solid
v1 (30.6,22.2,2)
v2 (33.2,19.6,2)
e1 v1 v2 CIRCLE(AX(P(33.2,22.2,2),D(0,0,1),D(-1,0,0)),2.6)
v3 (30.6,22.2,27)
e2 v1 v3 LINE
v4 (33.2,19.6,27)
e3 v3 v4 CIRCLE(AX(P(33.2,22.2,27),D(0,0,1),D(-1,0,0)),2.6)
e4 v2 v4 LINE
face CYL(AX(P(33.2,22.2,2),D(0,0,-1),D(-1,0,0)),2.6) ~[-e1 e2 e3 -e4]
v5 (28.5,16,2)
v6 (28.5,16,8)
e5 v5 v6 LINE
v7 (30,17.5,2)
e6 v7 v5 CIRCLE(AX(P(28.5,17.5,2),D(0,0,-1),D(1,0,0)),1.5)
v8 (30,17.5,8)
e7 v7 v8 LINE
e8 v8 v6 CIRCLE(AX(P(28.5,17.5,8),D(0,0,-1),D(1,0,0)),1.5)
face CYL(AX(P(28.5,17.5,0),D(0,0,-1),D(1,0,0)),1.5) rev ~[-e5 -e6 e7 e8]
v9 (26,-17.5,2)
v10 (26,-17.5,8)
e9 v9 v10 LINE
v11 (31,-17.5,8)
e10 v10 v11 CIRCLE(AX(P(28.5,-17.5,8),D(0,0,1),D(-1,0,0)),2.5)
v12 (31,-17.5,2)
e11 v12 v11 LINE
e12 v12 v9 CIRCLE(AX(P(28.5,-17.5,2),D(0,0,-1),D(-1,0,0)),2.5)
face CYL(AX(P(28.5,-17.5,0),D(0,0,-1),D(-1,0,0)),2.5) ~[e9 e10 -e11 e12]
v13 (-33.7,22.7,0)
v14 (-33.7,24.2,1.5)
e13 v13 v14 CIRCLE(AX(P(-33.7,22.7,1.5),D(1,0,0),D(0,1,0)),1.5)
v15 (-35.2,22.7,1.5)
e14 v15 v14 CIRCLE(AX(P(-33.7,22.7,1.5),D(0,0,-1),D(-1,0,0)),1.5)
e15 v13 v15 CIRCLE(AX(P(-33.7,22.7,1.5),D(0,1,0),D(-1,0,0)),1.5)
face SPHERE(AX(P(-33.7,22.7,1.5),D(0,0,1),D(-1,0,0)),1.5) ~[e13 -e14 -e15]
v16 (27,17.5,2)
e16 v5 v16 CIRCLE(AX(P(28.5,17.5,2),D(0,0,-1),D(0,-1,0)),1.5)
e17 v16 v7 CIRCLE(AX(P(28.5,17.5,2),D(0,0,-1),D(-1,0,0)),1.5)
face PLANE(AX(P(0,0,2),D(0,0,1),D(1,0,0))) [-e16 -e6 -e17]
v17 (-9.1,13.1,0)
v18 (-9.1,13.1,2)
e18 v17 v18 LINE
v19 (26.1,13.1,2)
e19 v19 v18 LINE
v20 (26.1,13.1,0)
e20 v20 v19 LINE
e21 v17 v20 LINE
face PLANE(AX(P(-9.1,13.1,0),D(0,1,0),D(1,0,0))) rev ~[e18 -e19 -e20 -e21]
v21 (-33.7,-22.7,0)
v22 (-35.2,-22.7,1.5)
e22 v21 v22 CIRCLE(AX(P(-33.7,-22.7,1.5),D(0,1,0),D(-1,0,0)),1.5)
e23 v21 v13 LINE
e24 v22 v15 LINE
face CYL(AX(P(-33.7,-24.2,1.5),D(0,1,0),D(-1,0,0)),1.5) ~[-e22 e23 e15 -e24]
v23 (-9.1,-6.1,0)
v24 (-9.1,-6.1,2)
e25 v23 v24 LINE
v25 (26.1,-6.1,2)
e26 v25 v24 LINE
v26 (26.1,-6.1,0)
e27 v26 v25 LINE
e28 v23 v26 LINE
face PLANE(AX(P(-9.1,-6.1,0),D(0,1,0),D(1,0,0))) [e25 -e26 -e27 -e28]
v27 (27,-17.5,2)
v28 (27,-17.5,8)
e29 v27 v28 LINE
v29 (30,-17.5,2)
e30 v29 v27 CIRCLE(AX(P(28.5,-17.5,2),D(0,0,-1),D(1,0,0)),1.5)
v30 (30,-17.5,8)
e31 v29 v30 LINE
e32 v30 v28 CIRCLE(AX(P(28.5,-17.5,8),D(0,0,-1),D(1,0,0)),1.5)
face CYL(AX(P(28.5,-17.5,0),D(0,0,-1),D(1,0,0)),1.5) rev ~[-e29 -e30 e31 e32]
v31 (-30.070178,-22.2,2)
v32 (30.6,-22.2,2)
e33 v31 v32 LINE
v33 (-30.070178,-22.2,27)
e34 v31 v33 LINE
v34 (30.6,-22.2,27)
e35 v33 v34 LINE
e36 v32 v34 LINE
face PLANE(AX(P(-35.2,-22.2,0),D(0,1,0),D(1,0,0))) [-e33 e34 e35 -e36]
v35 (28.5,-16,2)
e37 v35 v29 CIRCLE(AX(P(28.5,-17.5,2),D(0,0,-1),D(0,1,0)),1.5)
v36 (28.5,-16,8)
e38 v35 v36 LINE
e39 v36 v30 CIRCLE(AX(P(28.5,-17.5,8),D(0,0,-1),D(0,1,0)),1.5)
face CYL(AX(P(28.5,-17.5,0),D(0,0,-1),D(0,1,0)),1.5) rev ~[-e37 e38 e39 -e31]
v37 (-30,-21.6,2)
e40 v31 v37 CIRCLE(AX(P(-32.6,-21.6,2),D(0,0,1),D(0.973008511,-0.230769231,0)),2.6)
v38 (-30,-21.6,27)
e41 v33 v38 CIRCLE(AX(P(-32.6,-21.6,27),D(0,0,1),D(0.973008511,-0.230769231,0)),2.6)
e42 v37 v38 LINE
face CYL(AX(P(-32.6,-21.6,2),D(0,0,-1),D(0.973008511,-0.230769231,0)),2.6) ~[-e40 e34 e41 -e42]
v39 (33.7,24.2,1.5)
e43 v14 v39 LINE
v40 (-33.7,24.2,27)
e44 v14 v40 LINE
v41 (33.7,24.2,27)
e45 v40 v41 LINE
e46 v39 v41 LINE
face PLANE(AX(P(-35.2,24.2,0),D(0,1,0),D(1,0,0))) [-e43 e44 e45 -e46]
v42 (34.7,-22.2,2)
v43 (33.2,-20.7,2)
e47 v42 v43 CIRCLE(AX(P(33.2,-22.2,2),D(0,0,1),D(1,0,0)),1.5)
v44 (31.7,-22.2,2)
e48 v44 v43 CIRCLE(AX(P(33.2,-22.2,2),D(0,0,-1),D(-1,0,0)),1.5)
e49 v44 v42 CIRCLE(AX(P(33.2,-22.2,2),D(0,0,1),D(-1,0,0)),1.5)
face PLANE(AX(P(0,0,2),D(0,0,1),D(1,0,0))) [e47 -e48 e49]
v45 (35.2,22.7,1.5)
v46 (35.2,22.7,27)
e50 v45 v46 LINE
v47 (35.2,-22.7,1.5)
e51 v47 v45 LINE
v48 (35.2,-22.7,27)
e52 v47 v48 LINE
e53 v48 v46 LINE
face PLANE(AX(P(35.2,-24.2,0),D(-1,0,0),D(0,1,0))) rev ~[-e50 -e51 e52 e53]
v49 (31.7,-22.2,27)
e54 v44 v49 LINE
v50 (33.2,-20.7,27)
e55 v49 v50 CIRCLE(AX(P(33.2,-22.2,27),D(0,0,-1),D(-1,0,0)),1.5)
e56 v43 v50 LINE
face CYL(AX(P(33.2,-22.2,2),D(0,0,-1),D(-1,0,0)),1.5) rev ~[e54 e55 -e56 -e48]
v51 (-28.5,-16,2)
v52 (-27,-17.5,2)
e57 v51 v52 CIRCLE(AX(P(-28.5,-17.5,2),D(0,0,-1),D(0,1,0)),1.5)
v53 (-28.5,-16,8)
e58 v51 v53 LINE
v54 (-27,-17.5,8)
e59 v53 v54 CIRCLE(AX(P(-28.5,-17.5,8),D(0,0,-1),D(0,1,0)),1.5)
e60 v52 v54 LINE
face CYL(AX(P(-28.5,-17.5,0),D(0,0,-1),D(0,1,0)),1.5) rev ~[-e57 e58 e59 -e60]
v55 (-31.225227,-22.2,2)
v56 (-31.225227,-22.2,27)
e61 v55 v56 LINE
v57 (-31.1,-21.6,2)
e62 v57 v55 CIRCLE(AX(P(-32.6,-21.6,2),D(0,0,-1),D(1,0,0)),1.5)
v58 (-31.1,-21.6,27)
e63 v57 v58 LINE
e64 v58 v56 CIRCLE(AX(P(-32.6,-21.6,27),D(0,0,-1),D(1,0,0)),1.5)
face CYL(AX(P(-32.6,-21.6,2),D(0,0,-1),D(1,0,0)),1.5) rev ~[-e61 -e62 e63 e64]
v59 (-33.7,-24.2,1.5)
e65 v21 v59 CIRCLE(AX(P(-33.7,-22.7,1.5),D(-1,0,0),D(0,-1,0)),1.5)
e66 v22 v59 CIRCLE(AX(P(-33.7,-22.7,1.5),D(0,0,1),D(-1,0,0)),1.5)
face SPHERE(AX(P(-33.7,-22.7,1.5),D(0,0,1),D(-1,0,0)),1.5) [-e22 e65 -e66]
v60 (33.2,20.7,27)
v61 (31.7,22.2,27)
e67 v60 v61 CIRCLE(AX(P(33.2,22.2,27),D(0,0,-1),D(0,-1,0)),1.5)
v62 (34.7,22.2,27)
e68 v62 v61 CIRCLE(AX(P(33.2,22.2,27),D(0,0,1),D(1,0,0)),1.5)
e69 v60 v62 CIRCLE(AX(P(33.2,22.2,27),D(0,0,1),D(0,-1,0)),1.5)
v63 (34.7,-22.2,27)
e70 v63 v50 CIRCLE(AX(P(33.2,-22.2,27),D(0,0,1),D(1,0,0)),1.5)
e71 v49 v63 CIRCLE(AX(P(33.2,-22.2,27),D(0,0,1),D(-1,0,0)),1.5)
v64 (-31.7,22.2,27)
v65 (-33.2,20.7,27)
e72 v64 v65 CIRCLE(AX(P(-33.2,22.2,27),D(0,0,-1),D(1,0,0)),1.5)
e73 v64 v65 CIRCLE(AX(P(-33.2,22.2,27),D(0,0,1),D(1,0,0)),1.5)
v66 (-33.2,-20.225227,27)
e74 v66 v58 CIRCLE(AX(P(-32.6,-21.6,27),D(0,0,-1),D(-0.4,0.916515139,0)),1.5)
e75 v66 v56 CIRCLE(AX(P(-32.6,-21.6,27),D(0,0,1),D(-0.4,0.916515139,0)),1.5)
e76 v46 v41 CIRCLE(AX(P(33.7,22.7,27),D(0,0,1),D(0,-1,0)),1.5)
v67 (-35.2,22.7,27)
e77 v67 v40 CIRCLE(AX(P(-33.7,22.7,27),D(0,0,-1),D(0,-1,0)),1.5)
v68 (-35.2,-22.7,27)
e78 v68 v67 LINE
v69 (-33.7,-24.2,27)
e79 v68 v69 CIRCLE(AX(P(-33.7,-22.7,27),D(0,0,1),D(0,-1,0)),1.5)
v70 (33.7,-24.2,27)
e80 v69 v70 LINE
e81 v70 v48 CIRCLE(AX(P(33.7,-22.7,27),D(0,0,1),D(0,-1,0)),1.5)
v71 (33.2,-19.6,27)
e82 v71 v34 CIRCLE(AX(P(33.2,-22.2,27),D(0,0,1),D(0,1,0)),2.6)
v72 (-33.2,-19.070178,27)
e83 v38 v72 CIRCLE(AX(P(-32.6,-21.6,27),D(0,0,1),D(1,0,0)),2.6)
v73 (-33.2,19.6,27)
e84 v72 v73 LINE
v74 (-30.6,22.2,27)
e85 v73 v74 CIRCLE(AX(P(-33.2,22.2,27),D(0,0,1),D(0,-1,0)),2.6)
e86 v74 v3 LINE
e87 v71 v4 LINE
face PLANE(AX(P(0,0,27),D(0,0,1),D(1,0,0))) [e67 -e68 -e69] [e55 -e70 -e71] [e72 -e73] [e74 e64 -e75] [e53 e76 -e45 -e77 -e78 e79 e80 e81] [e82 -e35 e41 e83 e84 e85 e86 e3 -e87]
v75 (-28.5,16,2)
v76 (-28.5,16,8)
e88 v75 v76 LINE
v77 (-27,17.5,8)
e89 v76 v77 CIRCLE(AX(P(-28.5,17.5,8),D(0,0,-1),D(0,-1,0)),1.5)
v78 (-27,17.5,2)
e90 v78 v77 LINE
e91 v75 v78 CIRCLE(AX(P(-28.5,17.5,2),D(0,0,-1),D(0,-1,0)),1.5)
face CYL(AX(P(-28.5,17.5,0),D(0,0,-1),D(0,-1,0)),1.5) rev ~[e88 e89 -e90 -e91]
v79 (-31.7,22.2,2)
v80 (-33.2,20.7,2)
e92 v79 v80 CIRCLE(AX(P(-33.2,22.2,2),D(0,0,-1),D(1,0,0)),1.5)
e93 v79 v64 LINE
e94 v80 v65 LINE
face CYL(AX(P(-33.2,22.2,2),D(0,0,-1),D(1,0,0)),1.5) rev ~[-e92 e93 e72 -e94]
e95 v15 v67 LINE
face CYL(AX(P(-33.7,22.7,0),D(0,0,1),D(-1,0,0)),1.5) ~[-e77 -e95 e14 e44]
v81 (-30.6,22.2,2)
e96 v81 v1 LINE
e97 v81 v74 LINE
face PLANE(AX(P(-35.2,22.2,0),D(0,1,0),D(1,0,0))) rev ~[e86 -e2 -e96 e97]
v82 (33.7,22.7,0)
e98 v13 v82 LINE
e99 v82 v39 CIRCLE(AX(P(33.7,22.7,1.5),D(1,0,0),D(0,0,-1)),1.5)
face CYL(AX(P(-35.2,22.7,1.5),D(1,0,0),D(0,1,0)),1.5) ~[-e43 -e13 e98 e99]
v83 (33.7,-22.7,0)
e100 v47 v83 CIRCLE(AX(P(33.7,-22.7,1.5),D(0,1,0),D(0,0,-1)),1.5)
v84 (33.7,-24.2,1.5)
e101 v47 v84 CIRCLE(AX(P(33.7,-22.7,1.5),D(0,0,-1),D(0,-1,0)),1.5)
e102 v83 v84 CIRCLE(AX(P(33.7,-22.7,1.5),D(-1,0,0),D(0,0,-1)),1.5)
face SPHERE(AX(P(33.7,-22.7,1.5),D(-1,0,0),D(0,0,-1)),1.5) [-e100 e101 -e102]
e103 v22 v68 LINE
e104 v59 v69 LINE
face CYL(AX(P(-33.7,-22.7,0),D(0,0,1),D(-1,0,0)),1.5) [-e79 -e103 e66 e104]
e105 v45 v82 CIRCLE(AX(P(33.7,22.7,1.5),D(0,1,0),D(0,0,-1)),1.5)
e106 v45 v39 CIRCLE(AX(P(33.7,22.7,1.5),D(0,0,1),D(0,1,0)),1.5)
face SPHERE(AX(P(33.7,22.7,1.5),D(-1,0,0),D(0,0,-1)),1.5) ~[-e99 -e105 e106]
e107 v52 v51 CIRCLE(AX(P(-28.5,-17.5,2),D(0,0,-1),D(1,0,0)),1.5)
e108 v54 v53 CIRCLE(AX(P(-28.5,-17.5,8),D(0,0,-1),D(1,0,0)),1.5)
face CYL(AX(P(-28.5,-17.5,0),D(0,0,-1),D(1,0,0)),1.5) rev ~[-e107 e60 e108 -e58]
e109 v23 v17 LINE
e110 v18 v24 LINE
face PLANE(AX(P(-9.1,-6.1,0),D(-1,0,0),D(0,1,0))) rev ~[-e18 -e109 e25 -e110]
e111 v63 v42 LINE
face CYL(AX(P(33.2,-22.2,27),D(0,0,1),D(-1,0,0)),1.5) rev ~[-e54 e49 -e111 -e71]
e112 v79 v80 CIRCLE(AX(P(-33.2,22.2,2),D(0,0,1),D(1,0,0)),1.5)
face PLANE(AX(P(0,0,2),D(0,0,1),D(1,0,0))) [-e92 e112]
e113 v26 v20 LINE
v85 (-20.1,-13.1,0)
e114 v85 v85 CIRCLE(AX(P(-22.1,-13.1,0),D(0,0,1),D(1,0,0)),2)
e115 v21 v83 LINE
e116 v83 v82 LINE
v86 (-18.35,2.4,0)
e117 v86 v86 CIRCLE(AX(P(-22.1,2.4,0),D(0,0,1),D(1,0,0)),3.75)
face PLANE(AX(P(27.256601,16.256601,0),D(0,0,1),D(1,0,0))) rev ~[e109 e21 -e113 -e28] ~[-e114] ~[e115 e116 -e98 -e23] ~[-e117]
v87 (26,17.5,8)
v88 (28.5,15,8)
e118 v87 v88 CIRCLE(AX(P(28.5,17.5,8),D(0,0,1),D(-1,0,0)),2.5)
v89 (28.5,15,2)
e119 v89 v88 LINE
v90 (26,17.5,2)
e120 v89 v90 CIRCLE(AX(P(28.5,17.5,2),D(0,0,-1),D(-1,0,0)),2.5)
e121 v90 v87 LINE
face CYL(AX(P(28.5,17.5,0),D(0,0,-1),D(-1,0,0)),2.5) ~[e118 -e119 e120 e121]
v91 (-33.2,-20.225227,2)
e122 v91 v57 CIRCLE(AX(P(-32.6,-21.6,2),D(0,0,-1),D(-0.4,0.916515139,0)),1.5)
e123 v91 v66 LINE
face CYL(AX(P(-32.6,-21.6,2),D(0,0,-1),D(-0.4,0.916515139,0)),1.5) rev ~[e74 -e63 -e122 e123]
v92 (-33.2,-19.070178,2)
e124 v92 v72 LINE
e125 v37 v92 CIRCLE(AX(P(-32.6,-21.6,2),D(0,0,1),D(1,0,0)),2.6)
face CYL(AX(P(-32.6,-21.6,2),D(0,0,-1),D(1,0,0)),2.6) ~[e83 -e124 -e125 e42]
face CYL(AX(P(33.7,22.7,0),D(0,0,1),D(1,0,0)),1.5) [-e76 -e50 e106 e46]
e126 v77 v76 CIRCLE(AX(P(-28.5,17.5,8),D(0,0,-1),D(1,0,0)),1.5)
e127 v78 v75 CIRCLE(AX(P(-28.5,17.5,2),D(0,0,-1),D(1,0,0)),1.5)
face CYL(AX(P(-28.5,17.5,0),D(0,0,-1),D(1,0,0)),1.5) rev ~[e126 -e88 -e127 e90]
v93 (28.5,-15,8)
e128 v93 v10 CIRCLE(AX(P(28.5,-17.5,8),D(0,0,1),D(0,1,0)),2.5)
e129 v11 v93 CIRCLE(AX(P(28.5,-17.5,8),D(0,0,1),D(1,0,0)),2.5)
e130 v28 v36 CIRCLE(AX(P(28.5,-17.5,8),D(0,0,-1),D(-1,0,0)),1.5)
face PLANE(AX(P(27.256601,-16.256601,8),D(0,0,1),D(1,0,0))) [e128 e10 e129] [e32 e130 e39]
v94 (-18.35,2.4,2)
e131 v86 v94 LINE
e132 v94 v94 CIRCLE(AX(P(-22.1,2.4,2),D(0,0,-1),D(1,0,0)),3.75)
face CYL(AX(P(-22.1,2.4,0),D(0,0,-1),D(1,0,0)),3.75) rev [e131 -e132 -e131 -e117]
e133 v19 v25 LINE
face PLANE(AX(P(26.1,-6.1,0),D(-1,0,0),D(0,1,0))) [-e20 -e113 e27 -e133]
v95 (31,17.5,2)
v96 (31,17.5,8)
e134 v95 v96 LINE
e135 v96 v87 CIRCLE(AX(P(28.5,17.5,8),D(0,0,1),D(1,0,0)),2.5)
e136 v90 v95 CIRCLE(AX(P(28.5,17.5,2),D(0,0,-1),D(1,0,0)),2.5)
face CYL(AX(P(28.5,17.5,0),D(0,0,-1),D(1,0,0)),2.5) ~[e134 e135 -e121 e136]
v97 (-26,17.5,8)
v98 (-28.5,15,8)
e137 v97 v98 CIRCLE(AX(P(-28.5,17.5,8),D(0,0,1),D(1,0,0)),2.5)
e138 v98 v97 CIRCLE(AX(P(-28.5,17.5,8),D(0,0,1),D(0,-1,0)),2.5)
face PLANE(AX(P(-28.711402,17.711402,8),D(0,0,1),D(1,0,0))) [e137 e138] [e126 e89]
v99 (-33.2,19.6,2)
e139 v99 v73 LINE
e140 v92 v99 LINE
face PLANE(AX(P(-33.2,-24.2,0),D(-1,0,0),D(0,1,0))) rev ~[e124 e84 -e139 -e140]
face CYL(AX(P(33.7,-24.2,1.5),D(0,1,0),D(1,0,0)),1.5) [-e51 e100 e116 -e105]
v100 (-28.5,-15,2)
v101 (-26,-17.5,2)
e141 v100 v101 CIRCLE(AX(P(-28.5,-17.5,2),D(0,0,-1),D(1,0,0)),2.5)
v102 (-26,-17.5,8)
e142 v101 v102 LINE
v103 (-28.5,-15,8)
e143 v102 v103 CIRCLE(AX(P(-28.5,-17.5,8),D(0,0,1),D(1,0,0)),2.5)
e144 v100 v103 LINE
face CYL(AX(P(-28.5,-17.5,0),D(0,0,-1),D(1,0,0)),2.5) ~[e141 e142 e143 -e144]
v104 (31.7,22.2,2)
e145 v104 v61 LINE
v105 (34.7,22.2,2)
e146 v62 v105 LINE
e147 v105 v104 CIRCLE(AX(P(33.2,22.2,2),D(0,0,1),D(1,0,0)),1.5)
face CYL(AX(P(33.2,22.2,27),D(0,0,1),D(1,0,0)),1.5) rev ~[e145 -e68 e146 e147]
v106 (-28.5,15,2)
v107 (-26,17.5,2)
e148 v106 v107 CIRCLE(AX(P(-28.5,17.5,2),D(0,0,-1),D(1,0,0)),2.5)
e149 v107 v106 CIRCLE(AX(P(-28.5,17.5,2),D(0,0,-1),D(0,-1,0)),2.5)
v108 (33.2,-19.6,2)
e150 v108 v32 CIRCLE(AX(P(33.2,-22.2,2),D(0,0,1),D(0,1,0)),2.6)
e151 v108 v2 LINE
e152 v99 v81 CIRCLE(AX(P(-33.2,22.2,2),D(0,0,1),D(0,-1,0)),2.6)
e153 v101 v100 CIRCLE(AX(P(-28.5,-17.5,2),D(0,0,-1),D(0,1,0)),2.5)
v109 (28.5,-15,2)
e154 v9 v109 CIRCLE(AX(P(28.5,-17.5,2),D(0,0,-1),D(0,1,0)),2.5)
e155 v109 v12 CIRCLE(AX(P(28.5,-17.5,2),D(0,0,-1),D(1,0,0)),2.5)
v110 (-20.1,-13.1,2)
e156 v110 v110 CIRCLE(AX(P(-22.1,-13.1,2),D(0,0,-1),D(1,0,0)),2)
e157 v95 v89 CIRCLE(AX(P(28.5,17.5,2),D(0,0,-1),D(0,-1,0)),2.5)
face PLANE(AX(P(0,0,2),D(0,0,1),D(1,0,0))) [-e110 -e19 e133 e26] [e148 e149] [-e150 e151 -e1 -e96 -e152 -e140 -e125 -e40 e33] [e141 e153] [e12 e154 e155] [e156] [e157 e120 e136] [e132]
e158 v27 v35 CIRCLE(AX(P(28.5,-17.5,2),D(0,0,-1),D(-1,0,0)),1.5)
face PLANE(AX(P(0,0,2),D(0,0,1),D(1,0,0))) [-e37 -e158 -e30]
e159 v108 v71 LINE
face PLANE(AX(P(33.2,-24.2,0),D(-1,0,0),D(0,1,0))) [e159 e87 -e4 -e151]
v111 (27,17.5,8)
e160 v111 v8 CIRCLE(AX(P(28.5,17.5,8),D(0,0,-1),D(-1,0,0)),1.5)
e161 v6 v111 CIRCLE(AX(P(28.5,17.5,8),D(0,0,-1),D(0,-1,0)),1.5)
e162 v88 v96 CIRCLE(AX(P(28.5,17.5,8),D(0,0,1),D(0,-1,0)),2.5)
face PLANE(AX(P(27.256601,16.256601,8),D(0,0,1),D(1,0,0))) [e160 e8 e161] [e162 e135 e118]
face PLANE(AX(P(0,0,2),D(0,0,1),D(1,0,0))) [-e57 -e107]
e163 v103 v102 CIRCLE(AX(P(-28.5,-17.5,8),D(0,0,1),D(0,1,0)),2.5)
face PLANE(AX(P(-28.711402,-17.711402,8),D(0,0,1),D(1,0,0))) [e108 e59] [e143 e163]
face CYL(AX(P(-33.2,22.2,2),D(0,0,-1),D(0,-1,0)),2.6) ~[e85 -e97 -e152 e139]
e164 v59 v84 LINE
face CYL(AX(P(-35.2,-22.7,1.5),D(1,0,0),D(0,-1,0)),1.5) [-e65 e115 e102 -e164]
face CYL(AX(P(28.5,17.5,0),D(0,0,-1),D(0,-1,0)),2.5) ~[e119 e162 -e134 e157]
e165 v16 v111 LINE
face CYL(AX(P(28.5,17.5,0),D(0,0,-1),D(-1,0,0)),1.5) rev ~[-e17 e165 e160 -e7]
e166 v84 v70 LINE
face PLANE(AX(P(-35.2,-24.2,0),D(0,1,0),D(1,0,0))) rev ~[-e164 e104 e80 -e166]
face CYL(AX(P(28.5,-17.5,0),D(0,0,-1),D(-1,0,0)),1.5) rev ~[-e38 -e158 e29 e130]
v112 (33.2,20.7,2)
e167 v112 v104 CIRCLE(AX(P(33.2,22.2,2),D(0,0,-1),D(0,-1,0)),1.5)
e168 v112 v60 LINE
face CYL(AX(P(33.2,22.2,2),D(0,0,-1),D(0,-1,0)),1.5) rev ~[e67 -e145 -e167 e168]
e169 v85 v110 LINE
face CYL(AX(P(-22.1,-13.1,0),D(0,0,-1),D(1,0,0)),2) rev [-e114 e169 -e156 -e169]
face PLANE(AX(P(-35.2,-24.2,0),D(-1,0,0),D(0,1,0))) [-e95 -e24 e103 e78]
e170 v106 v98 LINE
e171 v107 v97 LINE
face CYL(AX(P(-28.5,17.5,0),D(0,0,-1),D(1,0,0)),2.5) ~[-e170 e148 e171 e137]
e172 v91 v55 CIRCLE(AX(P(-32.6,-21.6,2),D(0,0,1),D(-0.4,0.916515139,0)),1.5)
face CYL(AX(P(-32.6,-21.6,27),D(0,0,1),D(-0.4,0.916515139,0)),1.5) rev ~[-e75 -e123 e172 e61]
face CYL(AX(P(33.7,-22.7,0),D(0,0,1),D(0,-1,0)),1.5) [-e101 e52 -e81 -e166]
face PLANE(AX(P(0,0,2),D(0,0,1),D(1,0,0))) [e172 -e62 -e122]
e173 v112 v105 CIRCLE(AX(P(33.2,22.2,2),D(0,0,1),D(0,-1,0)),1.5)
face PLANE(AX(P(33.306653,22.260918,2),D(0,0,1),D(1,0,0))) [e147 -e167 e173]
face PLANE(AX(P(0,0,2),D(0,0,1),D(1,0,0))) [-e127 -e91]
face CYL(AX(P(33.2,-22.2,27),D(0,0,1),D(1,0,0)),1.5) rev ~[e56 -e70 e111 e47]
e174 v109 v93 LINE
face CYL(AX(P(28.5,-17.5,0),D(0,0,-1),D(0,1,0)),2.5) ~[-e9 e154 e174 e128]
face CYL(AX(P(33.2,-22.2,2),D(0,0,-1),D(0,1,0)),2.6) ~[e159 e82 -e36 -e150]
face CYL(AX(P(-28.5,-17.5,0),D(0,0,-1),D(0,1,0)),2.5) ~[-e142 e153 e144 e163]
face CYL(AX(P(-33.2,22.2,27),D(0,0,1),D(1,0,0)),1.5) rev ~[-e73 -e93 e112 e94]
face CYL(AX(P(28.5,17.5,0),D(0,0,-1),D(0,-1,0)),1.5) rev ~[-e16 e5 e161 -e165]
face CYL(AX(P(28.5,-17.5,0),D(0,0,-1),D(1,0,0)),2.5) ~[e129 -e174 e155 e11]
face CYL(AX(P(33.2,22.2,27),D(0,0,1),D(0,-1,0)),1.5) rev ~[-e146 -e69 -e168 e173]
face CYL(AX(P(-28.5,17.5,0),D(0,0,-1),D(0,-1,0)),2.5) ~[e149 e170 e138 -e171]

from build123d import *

# Parameters (mm, degrees)
F0_W      = 70.4
F0_H      = 48.4
F2_DEPTH  = 27
F3_T      = -2
F4_R      = 1.5
F1_R      = 2
F1_R_2    = 3.75
F5_DEPTH  = 25
F6_DEPTH  = 8
F1_W      = 35.2
F1_H      = 19.2
F7_DEPTH  = 25
F9_DEPTH  = 25
F11_DEPTH = 25


# Not quite as in the source:
# - a feature names something its author has since deleted; it is built from what else it names


with BuildPart() as f2:
    # F0 (on Top) → F2 (new body)
    with BuildSketch(Plane.XY):
        Rectangle(F0_W, F0_H)
    extrude(amount=F2_DEPTH)

    # F3
    f3_openings = [f2.faces().sort_by_distance(p)[0] for p in [
        (0, 0, 27),
    ]]
    offset(amount=F3_T, openings=f3_openings)

    # F4
    f4_edges = [f2.edges().sort_by_distance(p)[0] for p in [
        (-35.2, 24.2, 13.5),
        (-35.2, -24.2, 13.5),
        (-35.2, 0, 0),
        (0, 24.2, 0),
        (0, -24.2, 0),
        (35.2, 0, 0),
        (35.2, -24.2, 13.5),
        (35.2, 24.2, 13.5),
    ]]
    fillet(f4_edges, radius=F4_R)

    # F1 (on Top) → F5 (cut)
    with BuildSketch(Plane.XY):
        with Locations((-22.1, -13.1)):
            Circle(F1_R)
        with Locations((-22.1, 2.4)):
            Circle(F1_R_2)
    extrude(amount=F5_DEPTH, mode=Mode.SUBTRACT)

    # F1 (on Top) → F6 (join)
    with BuildSketch(Plane.XY):
        with BuildLine():
            Line((27, 17.5), (26, 17.5))
            ThreePointArc((26, 17.5), (26.732233047, 15.732233047), (28.5, 15))
            Line((28.5, 15), (28.5, 16))
            ThreePointArc((28.5, 16), (27.4393398282, 16.4393398282), (27, 17.5))
        make_face()
        with BuildLine():
            ThreePointArc((31, 17.5), (28.5, 20), (26, 17.5))
            Line((26, 17.5), (27, 17.5))
            ThreePointArc((27, 17.5), (28.5, 19), (30, 17.5))
            ThreePointArc((30, 17.5), (29.5606601718, 16.4393398282), (28.5, 16))
            Line((28.5, 16), (28.5, 15))
            ThreePointArc((28.5, 15), (30.267766953, 15.732233047), (31, 17.5))
        make_face()
        with BuildLine():
            Line((28.5, -16), (28.5, -15))
            ThreePointArc((28.5, -15), (26.732233047, -15.732233047), (26, -17.5))
            Line((26, -17.5), (27, -17.5))
            ThreePointArc((27, -17.5), (27.4393398282, -16.4393398282), (28.5, -16))
        make_face()
        with BuildLine():
            ThreePointArc((31, -17.5), (30.267766953, -15.732233047), (28.5, -15))
            Line((28.5, -15), (28.5, -16))
            ThreePointArc((28.5, -16), (29.5606601718, -16.4393398282), (30, -17.5))
            ThreePointArc((30, -17.5), (28.5, -19), (27, -17.5))
            Line((27, -17.5), (26, -17.5))
            ThreePointArc((26, -17.5), (28.5, -20), (31, -17.5))
        make_face()
        with BuildLine():
            Line((-28.5, -16), (-28.5, -15))
            ThreePointArc((-28.5, -15), (-30.267766953, -19.267766953), (-26, -17.5))
            Line((-26, -17.5), (-27, -17.5))
            ThreePointArc((-27, -17.5), (-29.5606601718, -18.5606601718), (-28.5, -16))
        make_face()
        with BuildLine():
            ThreePointArc((-26, -17.5), (-26.732233047, -15.732233047), (-28.5, -15))
            Line((-28.5, -15), (-28.5, -16))
            ThreePointArc((-28.5, -16), (-27.4393398282, -16.4393398282), (-27, -17.5))
            Line((-27, -17.5), (-26, -17.5))
        make_face()
        with BuildLine():
            Line((-27, 17.5), (-26, 17.5))
            ThreePointArc((-26, 17.5), (-30.267766953, 19.267766953), (-28.5, 15))
            Line((-28.5, 15), (-28.5, 16))
            ThreePointArc((-28.5, 16), (-29.5606601718, 18.5606601718), (-27, 17.5))
        make_face()
        with BuildLine():
            ThreePointArc((-28.5, 15), (-26.732233047, 15.732233047), (-26, 17.5))
            Line((-26, 17.5), (-27, 17.5))
            ThreePointArc((-27, 17.5), (-27.4393398282, 16.4393398282), (-28.5, 16))
            Line((-28.5, 16), (-28.5, 15))
        make_face()
    extrude(amount=F6_DEPTH)

    # F1 (on Top) → F7 (cut)
    with BuildSketch(Plane.XY):
        with Locations((8.5, 3.5)):
            Rectangle(F1_W, F1_H)
    extrude(amount=F7_DEPTH, mode=Mode.SUBTRACT)

    # F8 (on face) → F9 (join)
    with BuildSketch(Plane.XY.offset(2)):
        with BuildLine():
            ThreePointArc((-33.2, 19.6), (-31.3615223689, 20.3615223689), (-30.6, 22.2))
            Line((-30.6, 22.2), (-31.7, 22.2))
            ThreePointArc((-31.7, 22.2), (-32.1393398282, 21.1393398282), (-33.2, 20.7))
            Line((-33.2, 20.7), (-33.2, 19.6))
        make_face()
        with BuildLine():
            Line((31.7, 22.2), (30.6, 22.2))
            ThreePointArc((30.6, 22.2), (31.3615223689, 20.3615223689), (33.2, 19.6))
            Line((33.2, 19.6), (33.2, 20.7))
            ThreePointArc((33.2, 20.7), (32.1393398282, 21.1393398282), (31.7, 22.2))
        make_face()
        with BuildLine():
            Line((33.2, -20.7), (33.2, -19.6))
            ThreePointArc((33.2, -19.6), (31.3615223689, -20.3615223689), (30.6, -22.2))
            Line((30.6, -22.2), (31.7, -22.2))
            ThreePointArc((31.7, -22.2), (32.1393398282, -21.1393398282), (33.2, -20.7))
        make_face()
        with BuildLine():
            ThreePointArc((-30, -21.6), (-30.9875484503, -19.5603921946), (-33.2, -19.0701778719))
            Line((-33.2, -19.0701778719), (-33.2, -20.2252272915))
            ThreePointArc((-33.2, -20.2252272915), (-31.7784161637, -20.3450099602), (-31.1, -21.6))
            ThreePointArc((-31.1, -21.6), (-31.1316405306, -21.9064644655), (-31.2252272915, -22.2))
            Line((-31.2252272915, -22.2), (-30.0701778719, -22.2))
            ThreePointArc((-30.0701778719, -22.2), (-30.0176040647, -21.9020450851), (-30, -21.6))
        make_face()
    extrude(amount=F9_DEPTH)

    # F10 (on face) → F11 (cut)
    with BuildSketch(Plane.XY.offset(27)):
        with BuildLine():
            Line((-33.2, 22.2), (-31.7, 22.2))
            ThreePointArc((-31.7, 22.2), (-34.2606601718, 23.2606601718), (-33.2, 20.7))
            Line((-33.2, 20.7), (-33.2, 22.2))
        make_face()
        with BuildLine():
            ThreePointArc((-33.2, 20.7), (-32.1393398282, 21.1393398282), (-31.7, 22.2))
            Line((-31.7, 22.2), (-33.2, 22.2))
            Line((-33.2, 22.2), (-33.2, 20.7))
        make_face()
        with BuildLine():
            ThreePointArc((33.2, 20.7), (34.2606601718, 21.1393398282), (34.7, 22.2))
            ThreePointArc((34.7, 22.2), (33.2, 23.7), (31.7, 22.2))
            Line((31.7, 22.2), (33.2, 22.2))
            Line((33.2, 22.2), (33.2, 20.7))
        make_face()
        with BuildLine():
            Line((33.2, 22.2), (31.7, 22.2))
            ThreePointArc((31.7, 22.2), (32.1393398282, 21.1393398282), (33.2, 20.7))
            Line((33.2, 20.7), (33.2, 22.2))
        make_face()
        with BuildLine():
            ThreePointArc((31.7, -22.2), (33.2, -23.7), (34.7, -22.2))
            ThreePointArc((34.7, -22.2), (34.2606601718, -21.1393398282), (33.2, -20.7))
            Line((33.2, -20.7), (33.2, -22.2))
            Line((33.2, -22.2), (31.7, -22.2))
        make_face()
        with BuildLine():
            Line((-33.2, -22.2), (-33.2, -20.2252272915))
            ThreePointArc((-33.2, -20.2252272915), (-33.6606601718, -22.6606601718), (-31.2252272915, -22.2))
            Line((-31.2252272915, -22.2), (-33.2, -22.2))
        make_face()
    extrude(amount=-F11_DEPTH, mode=Mode.SUBTRACT)


solid = f2.part
